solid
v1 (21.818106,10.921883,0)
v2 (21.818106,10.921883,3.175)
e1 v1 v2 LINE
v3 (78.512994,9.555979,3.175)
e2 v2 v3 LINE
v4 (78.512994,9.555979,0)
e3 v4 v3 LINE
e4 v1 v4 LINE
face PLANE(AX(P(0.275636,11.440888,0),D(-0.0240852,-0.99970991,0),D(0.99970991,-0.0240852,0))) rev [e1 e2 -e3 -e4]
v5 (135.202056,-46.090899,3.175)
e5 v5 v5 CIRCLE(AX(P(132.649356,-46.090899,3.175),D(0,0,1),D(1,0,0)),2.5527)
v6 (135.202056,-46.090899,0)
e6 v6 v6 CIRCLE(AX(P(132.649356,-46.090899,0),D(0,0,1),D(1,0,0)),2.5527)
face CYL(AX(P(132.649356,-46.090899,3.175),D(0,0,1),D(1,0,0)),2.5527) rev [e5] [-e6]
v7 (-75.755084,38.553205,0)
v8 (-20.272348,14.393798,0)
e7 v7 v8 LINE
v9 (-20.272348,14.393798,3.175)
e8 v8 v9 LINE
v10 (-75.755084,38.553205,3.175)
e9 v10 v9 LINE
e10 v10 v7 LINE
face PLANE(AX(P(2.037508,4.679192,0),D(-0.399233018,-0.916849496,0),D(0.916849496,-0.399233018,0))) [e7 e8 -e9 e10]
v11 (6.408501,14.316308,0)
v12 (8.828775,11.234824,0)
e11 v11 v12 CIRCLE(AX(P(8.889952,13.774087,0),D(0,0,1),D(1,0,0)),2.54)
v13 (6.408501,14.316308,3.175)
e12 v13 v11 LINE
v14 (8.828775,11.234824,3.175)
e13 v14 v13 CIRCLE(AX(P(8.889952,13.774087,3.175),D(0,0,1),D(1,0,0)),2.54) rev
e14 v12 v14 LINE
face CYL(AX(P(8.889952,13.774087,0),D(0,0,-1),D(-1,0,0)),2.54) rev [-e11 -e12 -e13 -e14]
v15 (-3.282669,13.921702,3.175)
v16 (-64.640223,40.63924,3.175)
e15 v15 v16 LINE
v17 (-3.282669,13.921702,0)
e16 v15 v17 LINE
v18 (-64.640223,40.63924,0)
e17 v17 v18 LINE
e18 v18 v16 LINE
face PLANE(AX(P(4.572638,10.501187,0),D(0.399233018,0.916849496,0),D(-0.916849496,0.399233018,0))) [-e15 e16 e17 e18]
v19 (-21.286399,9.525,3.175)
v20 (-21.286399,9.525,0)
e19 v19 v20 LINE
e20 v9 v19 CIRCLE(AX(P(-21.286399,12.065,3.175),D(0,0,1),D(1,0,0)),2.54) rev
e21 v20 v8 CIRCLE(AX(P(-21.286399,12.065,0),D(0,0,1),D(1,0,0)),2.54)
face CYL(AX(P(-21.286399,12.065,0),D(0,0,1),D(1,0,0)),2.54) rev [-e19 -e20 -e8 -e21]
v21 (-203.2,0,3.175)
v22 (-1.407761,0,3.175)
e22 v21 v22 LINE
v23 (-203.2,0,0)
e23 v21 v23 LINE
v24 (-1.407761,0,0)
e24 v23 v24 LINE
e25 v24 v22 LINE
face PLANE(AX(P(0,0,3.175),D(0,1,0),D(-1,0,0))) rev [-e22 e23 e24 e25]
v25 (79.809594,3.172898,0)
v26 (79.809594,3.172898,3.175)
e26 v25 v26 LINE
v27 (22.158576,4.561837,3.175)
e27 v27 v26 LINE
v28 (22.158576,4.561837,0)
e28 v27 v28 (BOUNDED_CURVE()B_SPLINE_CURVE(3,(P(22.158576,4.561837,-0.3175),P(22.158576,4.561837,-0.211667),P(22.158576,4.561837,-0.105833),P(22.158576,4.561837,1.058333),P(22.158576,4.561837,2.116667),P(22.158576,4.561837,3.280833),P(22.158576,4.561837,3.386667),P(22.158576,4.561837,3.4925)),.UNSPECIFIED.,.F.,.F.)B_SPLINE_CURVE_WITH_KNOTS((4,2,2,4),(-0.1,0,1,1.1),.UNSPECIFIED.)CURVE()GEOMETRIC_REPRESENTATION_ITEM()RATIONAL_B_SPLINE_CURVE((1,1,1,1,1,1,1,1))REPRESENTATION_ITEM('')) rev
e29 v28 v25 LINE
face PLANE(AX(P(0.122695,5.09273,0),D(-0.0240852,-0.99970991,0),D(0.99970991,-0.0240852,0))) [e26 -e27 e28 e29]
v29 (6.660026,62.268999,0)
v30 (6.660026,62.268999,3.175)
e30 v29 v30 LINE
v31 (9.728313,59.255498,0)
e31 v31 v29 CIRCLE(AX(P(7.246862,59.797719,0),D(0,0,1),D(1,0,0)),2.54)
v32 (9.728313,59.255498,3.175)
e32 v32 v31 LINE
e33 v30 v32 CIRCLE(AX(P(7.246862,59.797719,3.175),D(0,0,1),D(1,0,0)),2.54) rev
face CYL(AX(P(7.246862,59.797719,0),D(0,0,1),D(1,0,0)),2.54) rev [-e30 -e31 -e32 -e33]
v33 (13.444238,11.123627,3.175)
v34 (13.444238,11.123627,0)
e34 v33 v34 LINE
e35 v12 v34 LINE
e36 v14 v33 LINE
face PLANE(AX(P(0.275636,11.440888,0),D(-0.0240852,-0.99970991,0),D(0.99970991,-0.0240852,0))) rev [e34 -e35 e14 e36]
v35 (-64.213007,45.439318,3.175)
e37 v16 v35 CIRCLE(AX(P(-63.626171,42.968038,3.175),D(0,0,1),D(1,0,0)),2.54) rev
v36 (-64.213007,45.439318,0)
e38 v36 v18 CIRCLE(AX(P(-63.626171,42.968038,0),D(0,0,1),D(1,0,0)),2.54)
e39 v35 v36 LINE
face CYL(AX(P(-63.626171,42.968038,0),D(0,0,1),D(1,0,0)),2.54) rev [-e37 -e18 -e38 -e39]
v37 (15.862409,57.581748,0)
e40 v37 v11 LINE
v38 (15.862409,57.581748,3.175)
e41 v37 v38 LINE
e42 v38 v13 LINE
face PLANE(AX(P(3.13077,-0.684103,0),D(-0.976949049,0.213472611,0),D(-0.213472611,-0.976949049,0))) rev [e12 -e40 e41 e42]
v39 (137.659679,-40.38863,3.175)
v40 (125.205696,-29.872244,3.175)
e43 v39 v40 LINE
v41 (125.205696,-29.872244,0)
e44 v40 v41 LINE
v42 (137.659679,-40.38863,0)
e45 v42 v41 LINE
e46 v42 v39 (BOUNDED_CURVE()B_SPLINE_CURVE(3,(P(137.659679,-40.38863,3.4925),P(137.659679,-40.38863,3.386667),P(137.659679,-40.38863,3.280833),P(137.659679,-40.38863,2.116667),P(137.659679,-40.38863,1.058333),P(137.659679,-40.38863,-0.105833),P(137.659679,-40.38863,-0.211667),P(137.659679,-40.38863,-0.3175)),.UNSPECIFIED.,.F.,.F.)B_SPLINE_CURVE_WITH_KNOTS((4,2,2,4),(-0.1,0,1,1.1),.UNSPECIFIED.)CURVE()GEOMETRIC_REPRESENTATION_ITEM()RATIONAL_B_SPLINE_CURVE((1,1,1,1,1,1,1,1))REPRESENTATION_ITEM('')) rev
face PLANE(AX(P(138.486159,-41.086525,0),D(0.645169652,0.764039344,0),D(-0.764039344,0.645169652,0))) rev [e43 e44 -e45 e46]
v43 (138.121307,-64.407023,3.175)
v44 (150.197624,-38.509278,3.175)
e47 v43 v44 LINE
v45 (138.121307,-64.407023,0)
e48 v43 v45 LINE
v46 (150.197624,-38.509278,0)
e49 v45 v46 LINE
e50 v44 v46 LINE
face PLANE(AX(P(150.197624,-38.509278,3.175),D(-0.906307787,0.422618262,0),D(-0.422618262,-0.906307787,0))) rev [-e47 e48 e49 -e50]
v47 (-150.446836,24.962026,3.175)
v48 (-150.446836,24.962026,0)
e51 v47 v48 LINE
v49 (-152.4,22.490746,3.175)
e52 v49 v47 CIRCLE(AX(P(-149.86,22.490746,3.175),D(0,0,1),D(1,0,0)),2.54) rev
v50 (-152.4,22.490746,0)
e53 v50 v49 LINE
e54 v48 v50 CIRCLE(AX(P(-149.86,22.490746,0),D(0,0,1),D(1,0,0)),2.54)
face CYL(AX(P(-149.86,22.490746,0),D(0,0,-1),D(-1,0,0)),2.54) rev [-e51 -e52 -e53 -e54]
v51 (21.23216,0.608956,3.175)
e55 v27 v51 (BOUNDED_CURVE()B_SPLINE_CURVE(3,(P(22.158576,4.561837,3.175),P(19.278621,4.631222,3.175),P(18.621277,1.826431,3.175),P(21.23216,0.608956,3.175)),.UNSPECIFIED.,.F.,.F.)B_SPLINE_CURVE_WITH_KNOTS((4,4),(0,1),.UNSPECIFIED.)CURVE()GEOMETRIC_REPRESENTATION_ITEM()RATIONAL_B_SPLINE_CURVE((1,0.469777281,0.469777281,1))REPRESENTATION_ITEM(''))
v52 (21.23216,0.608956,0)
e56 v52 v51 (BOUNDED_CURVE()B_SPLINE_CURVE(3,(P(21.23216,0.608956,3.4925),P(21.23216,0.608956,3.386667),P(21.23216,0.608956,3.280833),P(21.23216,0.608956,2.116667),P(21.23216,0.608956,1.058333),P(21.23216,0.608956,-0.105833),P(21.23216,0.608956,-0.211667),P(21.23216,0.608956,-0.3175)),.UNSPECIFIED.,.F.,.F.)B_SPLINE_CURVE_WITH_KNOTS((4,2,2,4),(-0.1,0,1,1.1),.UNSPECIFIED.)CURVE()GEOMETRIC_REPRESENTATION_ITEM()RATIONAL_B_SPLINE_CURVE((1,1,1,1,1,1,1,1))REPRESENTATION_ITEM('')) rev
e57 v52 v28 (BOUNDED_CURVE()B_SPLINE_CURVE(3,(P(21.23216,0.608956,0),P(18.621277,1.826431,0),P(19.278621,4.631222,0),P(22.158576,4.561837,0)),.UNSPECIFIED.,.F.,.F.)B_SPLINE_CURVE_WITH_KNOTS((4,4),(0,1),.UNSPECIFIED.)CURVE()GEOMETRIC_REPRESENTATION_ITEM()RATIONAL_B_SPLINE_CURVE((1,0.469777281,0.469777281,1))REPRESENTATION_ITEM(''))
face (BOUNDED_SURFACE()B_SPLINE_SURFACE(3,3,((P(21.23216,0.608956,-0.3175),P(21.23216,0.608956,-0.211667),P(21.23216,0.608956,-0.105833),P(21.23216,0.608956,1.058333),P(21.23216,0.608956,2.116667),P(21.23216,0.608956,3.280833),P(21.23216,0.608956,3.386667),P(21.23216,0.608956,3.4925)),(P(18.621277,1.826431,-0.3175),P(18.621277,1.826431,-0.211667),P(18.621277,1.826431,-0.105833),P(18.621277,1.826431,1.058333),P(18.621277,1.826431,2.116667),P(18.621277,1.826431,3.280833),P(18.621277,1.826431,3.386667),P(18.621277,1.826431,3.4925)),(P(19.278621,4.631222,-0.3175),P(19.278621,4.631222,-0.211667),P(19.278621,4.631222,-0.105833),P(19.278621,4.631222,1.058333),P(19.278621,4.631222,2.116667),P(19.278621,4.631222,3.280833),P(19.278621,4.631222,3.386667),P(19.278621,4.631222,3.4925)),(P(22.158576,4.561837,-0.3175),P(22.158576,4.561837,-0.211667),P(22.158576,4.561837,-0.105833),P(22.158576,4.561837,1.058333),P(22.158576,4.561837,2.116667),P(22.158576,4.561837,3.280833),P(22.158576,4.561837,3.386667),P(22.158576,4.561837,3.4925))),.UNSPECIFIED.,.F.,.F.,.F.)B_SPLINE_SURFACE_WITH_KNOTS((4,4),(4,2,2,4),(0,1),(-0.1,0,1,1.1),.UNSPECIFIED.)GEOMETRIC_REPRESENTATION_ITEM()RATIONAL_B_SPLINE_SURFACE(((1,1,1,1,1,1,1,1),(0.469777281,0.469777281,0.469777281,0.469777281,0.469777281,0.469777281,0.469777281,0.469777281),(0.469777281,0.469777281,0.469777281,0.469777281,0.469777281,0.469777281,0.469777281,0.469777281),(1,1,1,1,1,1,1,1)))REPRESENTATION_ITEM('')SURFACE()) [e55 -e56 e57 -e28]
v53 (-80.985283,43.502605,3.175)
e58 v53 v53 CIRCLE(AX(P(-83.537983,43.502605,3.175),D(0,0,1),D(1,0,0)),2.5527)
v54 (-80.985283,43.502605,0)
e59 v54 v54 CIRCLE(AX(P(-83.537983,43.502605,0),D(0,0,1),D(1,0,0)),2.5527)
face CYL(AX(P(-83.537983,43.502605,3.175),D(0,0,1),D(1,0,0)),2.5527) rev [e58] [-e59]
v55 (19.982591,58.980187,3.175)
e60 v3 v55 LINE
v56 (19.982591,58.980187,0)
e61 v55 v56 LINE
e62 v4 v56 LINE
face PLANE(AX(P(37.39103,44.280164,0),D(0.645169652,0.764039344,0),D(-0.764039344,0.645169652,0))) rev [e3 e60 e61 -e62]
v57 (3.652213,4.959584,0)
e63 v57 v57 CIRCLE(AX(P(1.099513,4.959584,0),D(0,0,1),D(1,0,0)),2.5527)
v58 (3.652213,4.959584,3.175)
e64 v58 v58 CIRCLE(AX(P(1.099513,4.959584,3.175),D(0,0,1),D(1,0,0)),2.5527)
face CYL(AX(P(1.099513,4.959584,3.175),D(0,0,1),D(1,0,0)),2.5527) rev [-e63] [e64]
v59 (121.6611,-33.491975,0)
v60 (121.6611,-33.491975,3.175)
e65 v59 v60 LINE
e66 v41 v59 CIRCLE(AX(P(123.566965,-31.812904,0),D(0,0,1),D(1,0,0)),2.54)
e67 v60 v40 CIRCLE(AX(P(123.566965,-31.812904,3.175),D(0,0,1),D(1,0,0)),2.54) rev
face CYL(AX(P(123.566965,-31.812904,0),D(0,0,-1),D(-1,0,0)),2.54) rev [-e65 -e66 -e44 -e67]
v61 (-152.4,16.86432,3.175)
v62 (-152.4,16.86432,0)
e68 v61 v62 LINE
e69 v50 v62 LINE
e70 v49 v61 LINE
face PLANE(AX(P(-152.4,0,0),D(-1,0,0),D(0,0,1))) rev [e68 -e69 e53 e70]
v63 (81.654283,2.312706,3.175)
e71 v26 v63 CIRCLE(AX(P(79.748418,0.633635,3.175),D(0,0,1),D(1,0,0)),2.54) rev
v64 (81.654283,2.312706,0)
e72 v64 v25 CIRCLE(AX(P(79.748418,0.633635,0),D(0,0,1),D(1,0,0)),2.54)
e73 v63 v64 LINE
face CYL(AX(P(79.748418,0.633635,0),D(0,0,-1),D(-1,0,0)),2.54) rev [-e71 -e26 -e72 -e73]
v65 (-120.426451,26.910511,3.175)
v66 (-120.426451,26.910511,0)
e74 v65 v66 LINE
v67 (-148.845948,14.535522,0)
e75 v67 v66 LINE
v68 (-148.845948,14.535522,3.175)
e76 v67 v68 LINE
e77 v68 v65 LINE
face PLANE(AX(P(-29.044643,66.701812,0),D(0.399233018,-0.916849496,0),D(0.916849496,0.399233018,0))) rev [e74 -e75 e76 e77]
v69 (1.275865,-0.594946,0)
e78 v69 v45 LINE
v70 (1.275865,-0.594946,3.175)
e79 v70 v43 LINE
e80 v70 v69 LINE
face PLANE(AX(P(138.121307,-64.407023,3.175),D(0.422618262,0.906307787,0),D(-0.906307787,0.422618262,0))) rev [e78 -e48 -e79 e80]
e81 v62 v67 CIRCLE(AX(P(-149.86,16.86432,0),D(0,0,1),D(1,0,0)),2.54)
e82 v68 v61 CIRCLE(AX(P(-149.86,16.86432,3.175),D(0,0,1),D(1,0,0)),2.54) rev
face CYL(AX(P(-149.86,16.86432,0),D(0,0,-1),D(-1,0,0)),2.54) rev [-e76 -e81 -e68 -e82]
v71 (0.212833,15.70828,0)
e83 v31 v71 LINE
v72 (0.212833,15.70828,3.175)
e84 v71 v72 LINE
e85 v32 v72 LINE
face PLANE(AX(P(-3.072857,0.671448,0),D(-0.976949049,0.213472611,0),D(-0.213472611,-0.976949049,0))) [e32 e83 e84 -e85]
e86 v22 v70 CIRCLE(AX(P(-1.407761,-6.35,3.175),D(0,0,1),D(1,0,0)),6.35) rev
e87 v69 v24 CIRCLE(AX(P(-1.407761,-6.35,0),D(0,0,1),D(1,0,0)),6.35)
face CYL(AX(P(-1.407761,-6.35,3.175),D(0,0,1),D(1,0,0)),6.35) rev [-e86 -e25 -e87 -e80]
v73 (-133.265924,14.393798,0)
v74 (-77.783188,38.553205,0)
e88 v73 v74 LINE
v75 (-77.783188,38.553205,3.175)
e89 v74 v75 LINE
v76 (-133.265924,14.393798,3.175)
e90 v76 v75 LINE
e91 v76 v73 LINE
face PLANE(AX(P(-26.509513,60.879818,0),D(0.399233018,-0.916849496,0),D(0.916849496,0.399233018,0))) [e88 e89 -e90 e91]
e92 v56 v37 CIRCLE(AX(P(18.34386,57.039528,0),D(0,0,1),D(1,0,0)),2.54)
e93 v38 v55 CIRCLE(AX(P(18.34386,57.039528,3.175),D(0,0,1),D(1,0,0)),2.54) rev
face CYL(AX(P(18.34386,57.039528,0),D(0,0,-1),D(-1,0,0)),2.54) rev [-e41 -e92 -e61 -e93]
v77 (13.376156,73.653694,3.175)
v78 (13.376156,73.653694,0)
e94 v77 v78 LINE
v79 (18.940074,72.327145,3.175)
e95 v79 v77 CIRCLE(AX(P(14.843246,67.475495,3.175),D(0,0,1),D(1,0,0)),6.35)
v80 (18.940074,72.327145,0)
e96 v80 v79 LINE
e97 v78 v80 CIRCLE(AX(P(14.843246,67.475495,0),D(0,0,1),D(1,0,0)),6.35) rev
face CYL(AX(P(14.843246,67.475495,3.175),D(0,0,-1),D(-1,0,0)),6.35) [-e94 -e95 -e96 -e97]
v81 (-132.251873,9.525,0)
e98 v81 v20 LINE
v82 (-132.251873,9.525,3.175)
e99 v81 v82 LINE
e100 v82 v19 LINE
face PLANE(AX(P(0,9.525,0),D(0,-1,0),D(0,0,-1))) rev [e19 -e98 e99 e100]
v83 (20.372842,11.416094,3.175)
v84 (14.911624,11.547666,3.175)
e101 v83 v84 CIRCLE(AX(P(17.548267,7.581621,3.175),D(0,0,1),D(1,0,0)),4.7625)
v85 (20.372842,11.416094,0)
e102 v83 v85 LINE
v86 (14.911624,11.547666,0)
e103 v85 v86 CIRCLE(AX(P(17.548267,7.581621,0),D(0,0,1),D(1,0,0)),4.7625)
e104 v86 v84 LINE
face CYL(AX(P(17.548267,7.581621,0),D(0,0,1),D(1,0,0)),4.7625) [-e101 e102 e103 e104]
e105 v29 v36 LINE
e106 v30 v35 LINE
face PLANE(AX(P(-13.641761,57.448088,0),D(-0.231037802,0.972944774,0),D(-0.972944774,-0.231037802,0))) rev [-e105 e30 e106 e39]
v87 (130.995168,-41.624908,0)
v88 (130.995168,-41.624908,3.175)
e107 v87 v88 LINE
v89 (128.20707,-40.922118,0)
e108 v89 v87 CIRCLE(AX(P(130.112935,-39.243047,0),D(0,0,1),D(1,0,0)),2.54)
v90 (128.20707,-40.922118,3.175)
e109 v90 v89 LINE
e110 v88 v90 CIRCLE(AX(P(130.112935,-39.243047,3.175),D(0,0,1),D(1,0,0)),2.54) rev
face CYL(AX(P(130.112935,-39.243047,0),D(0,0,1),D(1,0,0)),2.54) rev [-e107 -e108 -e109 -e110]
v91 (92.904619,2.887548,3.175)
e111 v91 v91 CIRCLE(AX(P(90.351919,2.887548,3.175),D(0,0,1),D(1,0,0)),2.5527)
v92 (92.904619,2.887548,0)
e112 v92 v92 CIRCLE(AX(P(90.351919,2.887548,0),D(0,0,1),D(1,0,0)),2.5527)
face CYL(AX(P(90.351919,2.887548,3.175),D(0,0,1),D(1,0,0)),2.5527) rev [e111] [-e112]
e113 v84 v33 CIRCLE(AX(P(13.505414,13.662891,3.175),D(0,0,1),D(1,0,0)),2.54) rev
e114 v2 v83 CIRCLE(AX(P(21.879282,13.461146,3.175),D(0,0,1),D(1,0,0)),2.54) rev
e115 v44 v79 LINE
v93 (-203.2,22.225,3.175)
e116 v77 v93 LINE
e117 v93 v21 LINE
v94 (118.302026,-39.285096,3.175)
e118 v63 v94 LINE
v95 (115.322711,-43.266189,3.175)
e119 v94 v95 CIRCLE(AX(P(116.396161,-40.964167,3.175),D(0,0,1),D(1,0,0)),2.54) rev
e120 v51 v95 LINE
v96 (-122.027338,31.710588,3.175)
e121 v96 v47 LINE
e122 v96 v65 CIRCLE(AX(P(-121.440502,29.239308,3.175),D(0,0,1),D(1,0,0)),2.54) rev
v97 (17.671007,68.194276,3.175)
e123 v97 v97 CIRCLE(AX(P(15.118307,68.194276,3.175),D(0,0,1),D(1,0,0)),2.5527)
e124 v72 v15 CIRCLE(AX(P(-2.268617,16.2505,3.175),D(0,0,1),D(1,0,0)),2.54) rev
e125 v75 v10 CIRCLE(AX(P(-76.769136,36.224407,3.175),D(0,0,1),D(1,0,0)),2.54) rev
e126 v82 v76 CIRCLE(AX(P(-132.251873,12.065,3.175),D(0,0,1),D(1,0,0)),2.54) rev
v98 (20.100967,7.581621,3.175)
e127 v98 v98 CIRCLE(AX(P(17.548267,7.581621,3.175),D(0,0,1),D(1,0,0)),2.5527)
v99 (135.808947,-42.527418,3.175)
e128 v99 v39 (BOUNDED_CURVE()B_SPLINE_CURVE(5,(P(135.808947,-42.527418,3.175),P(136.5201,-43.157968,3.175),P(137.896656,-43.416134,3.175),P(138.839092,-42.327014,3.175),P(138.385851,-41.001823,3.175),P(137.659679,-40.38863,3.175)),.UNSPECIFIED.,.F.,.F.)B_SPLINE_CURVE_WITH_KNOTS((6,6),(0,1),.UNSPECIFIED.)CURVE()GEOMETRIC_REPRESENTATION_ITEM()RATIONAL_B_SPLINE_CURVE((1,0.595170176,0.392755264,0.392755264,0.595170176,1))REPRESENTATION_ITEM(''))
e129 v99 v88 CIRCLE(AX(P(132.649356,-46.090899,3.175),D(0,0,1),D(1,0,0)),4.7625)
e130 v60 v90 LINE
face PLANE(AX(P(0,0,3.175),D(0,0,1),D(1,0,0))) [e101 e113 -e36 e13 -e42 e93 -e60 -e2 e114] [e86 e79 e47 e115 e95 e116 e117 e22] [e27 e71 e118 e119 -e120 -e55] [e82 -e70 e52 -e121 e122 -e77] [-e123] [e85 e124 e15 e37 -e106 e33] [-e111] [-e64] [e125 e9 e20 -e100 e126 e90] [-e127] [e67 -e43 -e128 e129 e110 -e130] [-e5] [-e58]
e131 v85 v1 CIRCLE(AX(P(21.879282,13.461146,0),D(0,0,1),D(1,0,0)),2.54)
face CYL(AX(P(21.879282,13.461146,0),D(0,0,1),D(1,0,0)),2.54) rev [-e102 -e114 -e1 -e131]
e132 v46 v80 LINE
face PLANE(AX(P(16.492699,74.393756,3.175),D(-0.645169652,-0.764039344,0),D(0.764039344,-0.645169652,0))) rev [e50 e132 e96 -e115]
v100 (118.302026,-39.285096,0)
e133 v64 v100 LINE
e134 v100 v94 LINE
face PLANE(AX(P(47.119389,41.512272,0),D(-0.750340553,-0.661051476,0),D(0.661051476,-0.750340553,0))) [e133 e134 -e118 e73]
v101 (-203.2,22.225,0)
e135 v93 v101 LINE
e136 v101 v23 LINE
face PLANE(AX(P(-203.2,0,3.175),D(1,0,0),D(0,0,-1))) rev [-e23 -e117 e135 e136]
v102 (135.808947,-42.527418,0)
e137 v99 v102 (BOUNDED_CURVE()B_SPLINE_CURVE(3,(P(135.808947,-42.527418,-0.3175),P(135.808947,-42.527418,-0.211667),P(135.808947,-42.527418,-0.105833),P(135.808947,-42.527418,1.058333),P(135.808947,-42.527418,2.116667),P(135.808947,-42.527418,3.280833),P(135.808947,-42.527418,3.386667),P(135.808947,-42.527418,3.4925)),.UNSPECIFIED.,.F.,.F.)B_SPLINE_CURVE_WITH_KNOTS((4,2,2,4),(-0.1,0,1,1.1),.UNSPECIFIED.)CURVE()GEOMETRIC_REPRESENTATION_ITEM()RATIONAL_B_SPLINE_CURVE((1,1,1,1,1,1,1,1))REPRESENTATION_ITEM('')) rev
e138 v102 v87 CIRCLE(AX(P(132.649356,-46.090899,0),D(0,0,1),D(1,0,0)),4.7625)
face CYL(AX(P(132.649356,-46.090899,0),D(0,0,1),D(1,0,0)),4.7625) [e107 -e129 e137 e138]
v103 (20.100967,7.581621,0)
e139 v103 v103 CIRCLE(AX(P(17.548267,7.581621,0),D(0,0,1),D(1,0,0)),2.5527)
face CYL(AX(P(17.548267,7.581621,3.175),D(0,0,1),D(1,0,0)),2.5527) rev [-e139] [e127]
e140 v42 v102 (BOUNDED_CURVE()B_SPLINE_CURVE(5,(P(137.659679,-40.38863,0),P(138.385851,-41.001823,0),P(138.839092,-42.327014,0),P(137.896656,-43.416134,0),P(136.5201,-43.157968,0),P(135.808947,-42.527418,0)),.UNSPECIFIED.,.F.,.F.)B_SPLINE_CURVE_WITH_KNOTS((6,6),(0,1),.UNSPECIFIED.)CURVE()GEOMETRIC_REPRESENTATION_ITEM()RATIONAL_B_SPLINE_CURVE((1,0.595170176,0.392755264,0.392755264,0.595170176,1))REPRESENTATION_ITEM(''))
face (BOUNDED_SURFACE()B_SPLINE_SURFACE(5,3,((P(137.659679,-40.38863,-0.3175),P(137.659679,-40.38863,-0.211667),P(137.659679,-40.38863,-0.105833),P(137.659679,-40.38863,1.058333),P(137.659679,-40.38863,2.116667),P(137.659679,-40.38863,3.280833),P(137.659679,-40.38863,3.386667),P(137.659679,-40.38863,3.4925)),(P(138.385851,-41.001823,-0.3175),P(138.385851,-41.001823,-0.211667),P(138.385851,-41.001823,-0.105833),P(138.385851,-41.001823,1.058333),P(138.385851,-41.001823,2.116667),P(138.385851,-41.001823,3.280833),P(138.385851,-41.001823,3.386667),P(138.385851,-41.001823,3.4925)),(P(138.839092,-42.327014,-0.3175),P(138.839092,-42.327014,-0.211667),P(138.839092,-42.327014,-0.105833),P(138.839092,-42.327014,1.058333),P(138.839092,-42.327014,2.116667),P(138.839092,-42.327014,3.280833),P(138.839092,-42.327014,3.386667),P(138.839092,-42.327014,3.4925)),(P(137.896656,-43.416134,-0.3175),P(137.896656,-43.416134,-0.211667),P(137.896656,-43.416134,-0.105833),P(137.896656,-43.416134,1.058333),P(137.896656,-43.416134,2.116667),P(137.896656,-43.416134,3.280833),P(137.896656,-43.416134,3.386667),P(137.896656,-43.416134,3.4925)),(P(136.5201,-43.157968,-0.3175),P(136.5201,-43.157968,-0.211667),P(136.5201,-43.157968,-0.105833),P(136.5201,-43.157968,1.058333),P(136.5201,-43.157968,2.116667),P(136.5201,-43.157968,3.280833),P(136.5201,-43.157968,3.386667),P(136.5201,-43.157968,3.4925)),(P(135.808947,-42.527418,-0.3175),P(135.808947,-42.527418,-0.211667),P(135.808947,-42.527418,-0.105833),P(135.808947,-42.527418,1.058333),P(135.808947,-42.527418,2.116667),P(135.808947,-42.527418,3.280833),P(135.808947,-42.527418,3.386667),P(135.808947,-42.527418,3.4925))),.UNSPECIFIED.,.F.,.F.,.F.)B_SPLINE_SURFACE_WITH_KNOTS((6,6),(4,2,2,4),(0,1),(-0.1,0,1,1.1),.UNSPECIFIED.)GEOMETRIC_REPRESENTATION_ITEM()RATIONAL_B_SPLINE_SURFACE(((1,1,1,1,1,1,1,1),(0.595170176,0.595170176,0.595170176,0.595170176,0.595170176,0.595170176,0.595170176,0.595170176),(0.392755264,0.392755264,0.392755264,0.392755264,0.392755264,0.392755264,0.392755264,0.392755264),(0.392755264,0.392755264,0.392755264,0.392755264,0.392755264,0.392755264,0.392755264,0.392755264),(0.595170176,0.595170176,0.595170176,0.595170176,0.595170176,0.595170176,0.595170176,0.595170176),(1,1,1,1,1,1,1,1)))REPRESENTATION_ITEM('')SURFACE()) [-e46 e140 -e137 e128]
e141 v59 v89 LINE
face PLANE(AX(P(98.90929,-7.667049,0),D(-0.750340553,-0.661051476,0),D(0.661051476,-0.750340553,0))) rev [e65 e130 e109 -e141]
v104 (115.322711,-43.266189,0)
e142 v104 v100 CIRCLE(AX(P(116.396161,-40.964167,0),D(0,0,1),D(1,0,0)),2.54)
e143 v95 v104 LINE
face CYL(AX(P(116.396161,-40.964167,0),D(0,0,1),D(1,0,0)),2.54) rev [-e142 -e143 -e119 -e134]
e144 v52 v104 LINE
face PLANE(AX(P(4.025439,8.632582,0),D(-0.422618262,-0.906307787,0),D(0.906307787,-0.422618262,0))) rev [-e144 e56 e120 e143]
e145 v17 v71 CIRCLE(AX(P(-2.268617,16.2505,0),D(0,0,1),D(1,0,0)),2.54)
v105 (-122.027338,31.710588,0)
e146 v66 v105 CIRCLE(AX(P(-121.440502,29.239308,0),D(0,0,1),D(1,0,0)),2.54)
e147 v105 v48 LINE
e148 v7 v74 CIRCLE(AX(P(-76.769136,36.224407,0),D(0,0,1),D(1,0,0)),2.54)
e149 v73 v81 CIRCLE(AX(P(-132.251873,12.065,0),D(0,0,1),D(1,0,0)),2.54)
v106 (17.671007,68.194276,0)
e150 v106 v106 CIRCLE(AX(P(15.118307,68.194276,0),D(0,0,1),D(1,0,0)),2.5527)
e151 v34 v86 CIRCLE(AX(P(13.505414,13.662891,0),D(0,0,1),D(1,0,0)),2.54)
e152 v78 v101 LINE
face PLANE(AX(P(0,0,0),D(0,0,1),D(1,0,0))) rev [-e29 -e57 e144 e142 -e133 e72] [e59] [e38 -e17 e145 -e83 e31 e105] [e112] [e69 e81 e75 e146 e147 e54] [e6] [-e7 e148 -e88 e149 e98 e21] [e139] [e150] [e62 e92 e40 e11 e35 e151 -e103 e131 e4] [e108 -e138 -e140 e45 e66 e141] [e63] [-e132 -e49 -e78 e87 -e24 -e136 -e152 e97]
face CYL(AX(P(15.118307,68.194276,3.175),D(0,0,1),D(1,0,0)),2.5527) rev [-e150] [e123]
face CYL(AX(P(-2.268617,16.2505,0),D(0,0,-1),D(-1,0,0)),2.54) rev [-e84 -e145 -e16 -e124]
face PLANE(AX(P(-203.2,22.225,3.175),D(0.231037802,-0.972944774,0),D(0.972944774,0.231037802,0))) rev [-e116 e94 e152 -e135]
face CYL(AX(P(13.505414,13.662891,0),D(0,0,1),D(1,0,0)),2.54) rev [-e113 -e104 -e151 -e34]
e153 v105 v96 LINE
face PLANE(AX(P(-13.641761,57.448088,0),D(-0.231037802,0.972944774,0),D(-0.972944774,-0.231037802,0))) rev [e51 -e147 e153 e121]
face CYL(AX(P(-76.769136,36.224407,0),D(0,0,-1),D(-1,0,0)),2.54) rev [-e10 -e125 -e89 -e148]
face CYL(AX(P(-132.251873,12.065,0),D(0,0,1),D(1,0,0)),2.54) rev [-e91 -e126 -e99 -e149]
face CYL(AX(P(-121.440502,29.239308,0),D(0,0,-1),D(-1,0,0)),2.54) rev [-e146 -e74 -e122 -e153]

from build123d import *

# Parameters (mm, degrees)
BOSS_EXTRUDE1_DEPTH    = 3.175
CUT_EXTRUDE1_DEPTH     = 3.175
F_10_CLEARANCE_HOLE1_D = 5.1054
FILLET1_R              = 6.35
FILLET2_R              = 2.54
F_10_CLEARANCE_HOLE2_D = 5.1054
FILLET3_DEPTH          = 3.175
FILLET4_DEPTH          = 3.175


with BuildPart() as part:
    # Sketch1 → Boss-Extrude1 (new body)
    with BuildSketch(Plane.XY):
        Polygon((0, 0), (-203.2, 0), (-203.2, 22.225), (16.492698582, 74.393755743), (150.197623574, -38.509278075), (138.121306744, -64.407023089), align=None)
    extrude(amount=BOSS_EXTRUDE1_DEPTH)

    # Sketch2 → Cut-Extrude1 (cut)
    with BuildSketch(Plane.XY.offset(3.175)):
        with BuildLine():
            ThreePointArc((21.24883588, 4.583754924), (18.61914073, 2.941077903), (15.535547838, 3.265329747))
            Line((15.535547838, 3.265329747), (126.332322757, -48.400054896))
            Line((126.332322757, -48.400054896), (80.920020655, 3.146145486))
            Line((80.920020655, 3.146145486), (21.24883588, 4.583754924))
        make_face()
        with BuildLine():
            Line((137.027076007, -44.215538399), (138.486158755, -41.086525347))
            Line((138.486158755, -41.086525347), (98.909290031, -7.667049227))
            Line((98.909290031, -7.667049227), (129.564314023, -42.462686891))
            ThreePointArc((129.564314023, -42.462686891), (133.738335549, -41.454571408), (137.027076007, -44.215538399))
        make_face()
        Polygon((-0.44732738, 12.687080727), (10.590747216, 63.202397136), (-71.622854337, 43.679757896), align=None)
        Polygon((-76.769135969, 38.994763822), (-144.447250959, 9.525), (-9.091020978, 9.525), align=None)
        Polygon((-94.260732486, 38.304112991), (-152.4, 24.498222921), (-152.4, 12.98794568), align=None)
        with BuildLine():
            Line((78.512994475, 9.555978624), (16.762189587, 61.699556828))
            Line((16.762189587, 61.699556828), (5.751368588, 11.308965438))
            Line((5.751368588, 11.308965438), (14.340754941, 11.102028322))
            ThreePointArc((14.340754941, 11.102028322), (17.662973074, 12.342739027), (20.921588597, 10.943481637))
            Line((20.921588597, 10.943481637), (78.512994475, 9.555978624))
        make_face()
    extrude(amount=-CUT_EXTRUDE1_DEPTH, mode=Mode.SUBTRACT)

    # #10 Clearance Hole1 (through all)
    with Locations(Plane.XY.offset(3.175)):
        with Locations((15.118307034, 68.194276097), (1.099513239, 4.959583716), (90.351919236, 2.887547679), (-83.537983118, 43.502605356)):
            Hole(F_10_CLEARANCE_HOLE1_D / 2)

    # Fillet1
    fillet1_edges = [part.edges().sort_by_distance(p)[0] for p in [
        (0, 0, 1.5875),
        (16.492698582, 74.393755743, 1.5875),
    ]]
    fillet(fillet1_edges, radius=FILLET1_R)

    # Fillet2
    fillet2_edges = [part.edges().sort_by_distance(p)[0] for p in [
        (80.920020655, 3.146145486, 1.5875),
        (126.332322757, -48.400054896, 1.5875),
        (20.921588597, 10.943481637, 1.5875),
        (14.340754941, 11.102028322, 1.5875),
        (5.751368588, 11.308965438, 1.5875),
        (16.762189587, 61.699556828, 1.5875),
        (-0.44732738, 12.687080727, 1.5875),
        (-71.622854337, 43.679757896, 1.5875),
        (10.590747216, 63.202397136, 1.5875),
        (-94.260732486, 38.304112991, 1.5875),
        (-152.4, 12.98794568, 1.5875),
        (-152.4, 24.498222921, 1.5875),
        (129.564314023, -42.462686891, 1.5875),
        (98.909290031, -7.667049227, 1.5875),
        (-76.769135969, 38.994763822, 1.5875),
        (-9.091020978, 9.525, 1.5875),
        (-144.447250959, 9.525, 1.5875),
    ]]
    fillet(fillet2_edges, radius=FILLET2_R)

    # #10 Clearance Hole2 (through all)
    with Locations(Plane.XY.offset(3.175)):
        with Locations((17.54826731, 7.581620583), (132.649356264, -46.090898658)):
            Hole(F_10_CLEARANCE_HOLE2_D / 2)

    # Fillet3: read off the stored shape, not the designer's step
    # Fillet3 outline → Fillet3 (add)
    with BuildSketch(Plane.XY):
        with BuildLine():
            Line((15.535547838, 3.265329747), (21.232159568, 0.608956072))
            add(Edge.make_bspline(
                [(21.232159568, 0.608956072), (19.885857145, 1.236747202), (19.378566273, 2.827814172), (20.725192465, 4.03358552)],
                knots=[0, 0, 0, 0, 0.69383671, 0.69383671, 0.69383671, 0.69383671], degree=3, weights=[1, 0.632112013, 0.519478217, 0.662098611]))
            ThreePointArc((20.725192465, 4.03358552), (18.245689672, 2.870462732), (15.535547838, 3.265329747))
        make_face()
        with BuildLine():
            ThreePointArc((21.24883588, 4.583754924), (20.997999412, 4.298214627), (20.725192465, 4.03358552))
            add(Edge.make_bspline(
                [(20.725192465, 4.03358552), (21.150941215, 4.414801664), (21.664082636, 4.573750721), (22.158575797, 4.561837299)],
                knots=[0.69383671, 0.69383671, 0.69383671, 0.69383671, 1, 1, 1, 1], degree=3, weights=[0.662098611, 0.725031472, 0.837665268, 1]))
            Line((22.158575797, 4.561837299), (21.24883588, 4.583754924))
        make_face()
    extrude(amount=FILLET3_DEPTH)

    # Fillet4: read off the stored shape, not the designer's step
    # Fillet4 outline → Fillet4 (add)
    with BuildSketch(Plane.XY):
        with BuildLine():
            Line((138.486158755, -41.086525347), (137.659679105, -40.38862989))
            add(Edge.make_bspline(
                [(137.659679105, -40.38862989), (137.885417825, -40.579248046), (138.092627638, -40.854150437), (138.228700196, -41.219427367), (138.224361363, -41.647951666), (138.029002465, -42.066900176)],
                knots=[0, 0, 0, 0, 0, 0, 0.431143376, 0.431143376, 0.431143376, 0.431143376, 0.431143376, 0.431143376], degree=5, weights=[1, 0.825460303, 0.688546423, 0.58925836, 0.527596114, 0.503559686]))
            Line((138.029002465, -42.066900176), (138.486158755, -41.086525347))
        make_face()
        with BuildLine():
            Line((137.027076007, -44.215538399), (138.029002465, -42.066900176))
            add(Edge.make_bspline(
                [(138.029002465, -42.066900176), (137.740787916, -42.684978272), (137.186504044, -43.023143687), (136.590787826, -43.018448848), (136.121756233, -42.804773213), (135.808946692, -42.527417975)],
                knots=[0.431143376, 0.431143376, 0.431143376, 0.431143376, 0.431143376, 0.431143376, 1, 1, 1, 1, 1, 1], degree=5, weights=[0.503559686, 0.471845684, 0.505632715, 0.604920778, 0.769709873, 1]))
            ThreePointArc((135.808946692, -42.527417975), (136.511376305, -43.304107052), (137.027076007, -44.215538399))
        make_face()
    extrude(amount=FILLET4_DEPTH)


solid = part.part
